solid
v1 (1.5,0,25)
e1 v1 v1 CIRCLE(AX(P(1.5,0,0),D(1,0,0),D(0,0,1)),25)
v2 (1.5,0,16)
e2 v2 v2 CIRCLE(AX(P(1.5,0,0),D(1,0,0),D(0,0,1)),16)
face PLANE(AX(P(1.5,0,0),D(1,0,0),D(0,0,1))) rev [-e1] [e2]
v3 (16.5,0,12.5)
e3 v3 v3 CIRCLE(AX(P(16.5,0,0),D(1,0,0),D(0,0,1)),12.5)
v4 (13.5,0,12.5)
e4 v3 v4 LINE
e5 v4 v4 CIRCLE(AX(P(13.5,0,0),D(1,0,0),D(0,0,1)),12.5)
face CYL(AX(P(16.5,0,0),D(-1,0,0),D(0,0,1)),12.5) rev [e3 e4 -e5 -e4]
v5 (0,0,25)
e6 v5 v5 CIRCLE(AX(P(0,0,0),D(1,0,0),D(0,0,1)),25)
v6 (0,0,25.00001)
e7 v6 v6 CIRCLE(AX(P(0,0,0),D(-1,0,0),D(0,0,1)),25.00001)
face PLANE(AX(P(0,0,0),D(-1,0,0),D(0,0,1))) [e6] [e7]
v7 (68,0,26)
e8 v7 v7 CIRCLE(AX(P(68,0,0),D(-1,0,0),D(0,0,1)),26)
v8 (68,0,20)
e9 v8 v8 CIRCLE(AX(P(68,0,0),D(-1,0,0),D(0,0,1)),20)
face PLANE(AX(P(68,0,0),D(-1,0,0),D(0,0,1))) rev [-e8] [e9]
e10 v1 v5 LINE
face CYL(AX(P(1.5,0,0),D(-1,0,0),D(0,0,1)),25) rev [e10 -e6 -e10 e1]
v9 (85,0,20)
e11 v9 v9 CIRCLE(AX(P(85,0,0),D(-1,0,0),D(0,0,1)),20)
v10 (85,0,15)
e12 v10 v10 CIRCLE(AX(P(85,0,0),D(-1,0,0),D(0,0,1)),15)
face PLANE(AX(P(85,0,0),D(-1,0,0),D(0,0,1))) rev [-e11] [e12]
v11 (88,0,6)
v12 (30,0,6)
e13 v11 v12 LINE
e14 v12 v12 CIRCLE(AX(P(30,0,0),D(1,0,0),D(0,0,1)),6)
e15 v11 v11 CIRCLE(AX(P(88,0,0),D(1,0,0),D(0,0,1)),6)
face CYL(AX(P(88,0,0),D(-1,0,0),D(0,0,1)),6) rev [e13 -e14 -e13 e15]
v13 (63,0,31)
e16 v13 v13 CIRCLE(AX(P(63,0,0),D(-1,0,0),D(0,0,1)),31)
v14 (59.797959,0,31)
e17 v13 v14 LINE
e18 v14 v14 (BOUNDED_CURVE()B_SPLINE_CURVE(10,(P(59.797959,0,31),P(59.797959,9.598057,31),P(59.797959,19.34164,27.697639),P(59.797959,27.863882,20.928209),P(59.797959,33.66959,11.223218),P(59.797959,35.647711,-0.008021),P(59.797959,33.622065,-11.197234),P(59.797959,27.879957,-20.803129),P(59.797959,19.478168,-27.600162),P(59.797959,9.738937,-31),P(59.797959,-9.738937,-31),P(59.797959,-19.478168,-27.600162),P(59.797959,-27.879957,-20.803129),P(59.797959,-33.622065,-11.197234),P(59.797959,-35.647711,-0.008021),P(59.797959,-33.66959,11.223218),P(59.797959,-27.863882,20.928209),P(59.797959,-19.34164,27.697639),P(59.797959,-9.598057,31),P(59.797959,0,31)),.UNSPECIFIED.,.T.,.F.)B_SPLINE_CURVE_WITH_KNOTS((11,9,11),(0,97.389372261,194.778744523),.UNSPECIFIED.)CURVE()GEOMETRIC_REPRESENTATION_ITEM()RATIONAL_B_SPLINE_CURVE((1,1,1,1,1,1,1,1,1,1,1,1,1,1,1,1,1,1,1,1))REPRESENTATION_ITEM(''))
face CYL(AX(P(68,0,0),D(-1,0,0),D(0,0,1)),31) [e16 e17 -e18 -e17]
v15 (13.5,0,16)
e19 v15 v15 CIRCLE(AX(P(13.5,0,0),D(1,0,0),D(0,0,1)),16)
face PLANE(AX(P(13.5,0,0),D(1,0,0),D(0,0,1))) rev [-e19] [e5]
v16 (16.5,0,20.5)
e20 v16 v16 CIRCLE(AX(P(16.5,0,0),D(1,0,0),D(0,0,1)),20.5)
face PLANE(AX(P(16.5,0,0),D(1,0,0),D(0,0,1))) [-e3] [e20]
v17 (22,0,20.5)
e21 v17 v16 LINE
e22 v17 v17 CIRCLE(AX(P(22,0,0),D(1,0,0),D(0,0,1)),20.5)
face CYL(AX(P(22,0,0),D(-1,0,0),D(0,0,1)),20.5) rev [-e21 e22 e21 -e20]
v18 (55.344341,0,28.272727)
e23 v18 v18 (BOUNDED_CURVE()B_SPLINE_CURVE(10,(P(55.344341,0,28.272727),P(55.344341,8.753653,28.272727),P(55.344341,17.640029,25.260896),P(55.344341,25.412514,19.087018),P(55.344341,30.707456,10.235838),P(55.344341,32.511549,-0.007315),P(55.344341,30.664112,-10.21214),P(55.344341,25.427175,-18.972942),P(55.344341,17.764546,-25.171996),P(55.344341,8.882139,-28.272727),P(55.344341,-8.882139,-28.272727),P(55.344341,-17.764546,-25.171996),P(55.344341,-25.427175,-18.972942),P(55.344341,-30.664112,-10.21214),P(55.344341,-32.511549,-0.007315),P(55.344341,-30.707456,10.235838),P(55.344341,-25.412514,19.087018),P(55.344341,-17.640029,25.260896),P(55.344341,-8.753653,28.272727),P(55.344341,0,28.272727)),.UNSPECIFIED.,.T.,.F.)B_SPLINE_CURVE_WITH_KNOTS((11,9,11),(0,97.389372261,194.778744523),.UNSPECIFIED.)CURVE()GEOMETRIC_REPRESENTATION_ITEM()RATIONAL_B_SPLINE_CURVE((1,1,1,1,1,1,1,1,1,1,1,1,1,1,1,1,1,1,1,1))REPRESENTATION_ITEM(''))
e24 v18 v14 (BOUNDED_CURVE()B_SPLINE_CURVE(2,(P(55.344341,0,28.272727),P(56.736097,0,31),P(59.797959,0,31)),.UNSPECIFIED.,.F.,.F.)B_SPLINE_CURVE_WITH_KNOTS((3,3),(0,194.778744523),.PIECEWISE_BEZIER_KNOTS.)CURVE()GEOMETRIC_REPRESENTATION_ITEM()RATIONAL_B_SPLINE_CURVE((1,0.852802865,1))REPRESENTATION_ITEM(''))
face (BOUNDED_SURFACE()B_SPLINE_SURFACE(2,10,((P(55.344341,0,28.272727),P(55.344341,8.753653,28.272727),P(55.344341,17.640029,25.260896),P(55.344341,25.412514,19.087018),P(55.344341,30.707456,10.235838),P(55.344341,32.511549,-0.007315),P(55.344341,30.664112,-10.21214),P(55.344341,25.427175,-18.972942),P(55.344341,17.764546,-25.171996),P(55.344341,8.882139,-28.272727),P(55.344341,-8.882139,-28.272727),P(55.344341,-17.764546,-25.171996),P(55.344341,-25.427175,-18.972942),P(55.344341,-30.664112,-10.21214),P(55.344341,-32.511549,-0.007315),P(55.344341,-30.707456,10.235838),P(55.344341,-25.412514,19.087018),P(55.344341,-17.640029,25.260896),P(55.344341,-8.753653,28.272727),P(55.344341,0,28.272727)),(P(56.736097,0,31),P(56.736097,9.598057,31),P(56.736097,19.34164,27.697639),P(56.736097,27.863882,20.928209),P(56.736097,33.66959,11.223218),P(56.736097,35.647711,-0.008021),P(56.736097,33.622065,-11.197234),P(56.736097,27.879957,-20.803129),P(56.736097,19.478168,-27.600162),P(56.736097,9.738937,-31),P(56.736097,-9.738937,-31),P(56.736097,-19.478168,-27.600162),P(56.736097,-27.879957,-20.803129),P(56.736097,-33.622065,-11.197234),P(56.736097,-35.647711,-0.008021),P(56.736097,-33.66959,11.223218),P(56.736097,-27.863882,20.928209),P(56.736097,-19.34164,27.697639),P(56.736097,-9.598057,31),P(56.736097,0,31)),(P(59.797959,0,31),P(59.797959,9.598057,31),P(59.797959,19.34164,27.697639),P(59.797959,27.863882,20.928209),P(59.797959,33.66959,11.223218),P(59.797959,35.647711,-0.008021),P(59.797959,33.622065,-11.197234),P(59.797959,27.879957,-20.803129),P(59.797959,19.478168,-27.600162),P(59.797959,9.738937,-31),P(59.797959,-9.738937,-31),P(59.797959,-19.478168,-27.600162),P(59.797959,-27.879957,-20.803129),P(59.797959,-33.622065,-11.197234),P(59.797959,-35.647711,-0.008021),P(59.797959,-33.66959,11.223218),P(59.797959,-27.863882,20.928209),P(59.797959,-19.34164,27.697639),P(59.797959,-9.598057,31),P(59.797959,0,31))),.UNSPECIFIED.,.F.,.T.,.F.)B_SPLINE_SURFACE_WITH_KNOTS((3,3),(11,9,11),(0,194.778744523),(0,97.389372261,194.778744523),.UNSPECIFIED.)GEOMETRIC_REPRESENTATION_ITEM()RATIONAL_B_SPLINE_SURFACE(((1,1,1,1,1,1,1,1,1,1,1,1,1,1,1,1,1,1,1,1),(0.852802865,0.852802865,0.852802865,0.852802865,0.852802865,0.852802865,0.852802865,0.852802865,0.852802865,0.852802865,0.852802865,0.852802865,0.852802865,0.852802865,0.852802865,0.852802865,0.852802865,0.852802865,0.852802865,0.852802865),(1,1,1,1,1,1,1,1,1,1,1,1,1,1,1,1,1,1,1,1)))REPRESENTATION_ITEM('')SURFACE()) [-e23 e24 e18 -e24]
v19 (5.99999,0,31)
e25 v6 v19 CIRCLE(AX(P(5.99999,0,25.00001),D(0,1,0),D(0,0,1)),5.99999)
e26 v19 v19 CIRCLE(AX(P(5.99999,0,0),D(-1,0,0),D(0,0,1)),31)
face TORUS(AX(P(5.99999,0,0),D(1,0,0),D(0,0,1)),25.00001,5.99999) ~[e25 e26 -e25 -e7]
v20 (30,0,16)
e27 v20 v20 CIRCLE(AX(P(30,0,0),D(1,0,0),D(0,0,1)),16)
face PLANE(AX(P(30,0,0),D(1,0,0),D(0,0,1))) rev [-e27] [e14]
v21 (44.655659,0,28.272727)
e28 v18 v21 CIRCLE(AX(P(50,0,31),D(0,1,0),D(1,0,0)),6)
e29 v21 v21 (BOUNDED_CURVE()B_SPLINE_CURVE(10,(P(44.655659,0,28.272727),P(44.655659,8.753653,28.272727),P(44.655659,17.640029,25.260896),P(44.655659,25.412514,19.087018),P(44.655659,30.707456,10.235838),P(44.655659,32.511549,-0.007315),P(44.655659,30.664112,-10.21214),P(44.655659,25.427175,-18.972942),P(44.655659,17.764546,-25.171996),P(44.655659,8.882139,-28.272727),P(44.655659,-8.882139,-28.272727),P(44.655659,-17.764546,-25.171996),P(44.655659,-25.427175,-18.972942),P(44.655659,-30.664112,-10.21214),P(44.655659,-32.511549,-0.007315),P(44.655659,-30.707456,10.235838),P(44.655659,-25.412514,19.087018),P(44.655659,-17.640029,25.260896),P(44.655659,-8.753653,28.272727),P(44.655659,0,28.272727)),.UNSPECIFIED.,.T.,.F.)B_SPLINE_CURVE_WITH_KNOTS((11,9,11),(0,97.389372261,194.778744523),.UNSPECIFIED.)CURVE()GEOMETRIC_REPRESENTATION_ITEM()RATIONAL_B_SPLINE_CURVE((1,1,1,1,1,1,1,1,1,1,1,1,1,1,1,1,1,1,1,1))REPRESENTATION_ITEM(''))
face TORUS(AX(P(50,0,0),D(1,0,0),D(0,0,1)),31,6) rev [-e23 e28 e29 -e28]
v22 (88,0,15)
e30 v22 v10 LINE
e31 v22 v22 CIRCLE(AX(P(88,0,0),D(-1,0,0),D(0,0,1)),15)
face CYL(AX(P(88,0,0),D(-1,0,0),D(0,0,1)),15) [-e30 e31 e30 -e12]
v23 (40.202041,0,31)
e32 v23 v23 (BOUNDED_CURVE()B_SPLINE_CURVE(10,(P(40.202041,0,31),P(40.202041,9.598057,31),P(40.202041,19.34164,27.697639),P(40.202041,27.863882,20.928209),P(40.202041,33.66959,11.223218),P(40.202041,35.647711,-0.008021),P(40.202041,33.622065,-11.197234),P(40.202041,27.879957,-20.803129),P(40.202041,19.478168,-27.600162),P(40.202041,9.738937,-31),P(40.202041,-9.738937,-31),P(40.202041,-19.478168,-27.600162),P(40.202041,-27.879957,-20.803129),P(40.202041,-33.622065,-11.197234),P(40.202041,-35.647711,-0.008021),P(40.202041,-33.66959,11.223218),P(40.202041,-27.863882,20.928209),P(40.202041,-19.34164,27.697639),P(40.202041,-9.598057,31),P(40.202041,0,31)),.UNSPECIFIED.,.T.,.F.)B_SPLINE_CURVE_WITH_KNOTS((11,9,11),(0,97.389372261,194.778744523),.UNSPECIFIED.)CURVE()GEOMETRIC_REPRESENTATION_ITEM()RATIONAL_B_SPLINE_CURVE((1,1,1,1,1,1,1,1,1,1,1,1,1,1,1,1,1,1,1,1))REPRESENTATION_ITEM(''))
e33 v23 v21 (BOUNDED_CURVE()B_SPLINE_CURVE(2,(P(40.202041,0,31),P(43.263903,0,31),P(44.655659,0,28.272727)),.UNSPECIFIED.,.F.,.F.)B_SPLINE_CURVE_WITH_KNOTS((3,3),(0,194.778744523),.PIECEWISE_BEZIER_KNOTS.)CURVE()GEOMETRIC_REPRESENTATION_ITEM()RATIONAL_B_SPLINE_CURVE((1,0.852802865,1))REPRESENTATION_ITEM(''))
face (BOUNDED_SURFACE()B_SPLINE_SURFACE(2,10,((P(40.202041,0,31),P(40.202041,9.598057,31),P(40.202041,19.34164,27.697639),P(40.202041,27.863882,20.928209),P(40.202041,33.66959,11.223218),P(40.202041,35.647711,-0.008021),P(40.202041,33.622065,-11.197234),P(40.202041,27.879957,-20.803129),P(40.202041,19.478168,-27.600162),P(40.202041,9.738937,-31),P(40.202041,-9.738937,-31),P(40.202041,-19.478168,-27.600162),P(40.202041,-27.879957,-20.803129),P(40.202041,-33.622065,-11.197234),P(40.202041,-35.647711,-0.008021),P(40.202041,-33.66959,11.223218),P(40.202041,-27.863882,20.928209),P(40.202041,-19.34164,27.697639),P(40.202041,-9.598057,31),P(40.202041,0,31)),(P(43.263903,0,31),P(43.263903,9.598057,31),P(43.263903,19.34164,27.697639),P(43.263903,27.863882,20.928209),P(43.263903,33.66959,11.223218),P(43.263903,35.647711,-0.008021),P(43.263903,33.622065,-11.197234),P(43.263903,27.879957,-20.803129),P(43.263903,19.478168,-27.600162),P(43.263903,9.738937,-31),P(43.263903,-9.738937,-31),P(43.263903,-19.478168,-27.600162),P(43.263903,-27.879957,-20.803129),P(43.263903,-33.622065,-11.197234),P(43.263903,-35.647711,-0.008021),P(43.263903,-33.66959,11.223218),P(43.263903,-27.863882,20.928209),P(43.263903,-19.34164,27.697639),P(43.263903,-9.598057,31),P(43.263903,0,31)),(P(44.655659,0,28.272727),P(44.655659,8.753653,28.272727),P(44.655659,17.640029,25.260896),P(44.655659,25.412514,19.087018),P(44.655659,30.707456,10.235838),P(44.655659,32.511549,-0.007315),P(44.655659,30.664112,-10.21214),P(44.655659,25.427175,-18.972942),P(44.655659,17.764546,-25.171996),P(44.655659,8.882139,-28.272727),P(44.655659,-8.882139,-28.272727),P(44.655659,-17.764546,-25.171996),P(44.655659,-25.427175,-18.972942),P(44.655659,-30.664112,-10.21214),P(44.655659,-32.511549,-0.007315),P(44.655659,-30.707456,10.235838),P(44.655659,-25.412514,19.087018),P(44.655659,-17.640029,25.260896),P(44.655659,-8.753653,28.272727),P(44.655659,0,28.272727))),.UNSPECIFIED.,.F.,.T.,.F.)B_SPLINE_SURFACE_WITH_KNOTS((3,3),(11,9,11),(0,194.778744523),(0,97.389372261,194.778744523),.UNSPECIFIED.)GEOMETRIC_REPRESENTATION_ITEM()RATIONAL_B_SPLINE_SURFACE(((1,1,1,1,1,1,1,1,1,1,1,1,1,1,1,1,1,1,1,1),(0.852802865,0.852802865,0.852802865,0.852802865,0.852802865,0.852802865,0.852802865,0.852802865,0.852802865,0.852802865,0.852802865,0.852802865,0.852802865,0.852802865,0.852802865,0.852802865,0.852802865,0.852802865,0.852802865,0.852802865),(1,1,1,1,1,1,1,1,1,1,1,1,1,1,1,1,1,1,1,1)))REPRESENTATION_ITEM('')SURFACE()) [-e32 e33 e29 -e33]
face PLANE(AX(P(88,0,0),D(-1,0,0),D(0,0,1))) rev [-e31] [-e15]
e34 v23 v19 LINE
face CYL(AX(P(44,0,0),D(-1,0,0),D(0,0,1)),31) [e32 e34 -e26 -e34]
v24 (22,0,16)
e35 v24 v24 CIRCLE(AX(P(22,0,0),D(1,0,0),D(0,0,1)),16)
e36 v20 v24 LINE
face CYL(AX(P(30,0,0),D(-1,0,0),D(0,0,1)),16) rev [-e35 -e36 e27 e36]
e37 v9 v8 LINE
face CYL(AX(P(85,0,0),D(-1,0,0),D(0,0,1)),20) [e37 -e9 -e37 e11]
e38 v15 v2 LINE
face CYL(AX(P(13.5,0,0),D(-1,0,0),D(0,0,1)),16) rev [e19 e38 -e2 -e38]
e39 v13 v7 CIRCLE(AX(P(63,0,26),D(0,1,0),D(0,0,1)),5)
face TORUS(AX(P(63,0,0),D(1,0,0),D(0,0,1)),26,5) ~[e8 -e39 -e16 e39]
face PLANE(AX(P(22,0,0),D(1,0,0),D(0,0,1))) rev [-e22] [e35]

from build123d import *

# Parameters (mm, degrees)
F4_R = 5.99999
F5_R = 5
F6_R = 5


# Not quite as in the source:
# - a fillet or chamfer is up to 0.001 mm smaller than in the source, because OpenCascade refuses the exact size


with BuildPart() as f1:
    # F0 (on Front) → F1 (revolve)
    with BuildSketch(Plane.XZ):
        with BuildLine():
            Line((0, 31), (0, 0))
            Line((0, 0), (88, 0))
            Line((88, 0), (88, 15))
            Line((88, 15), (85, 15))
            Line((85, 15), (85, 20))
            Line((85, 20), (68, 20))
            Line((68, 20), (68, 31))
            Line((68, 31), (56, 31))
            ThreePointArc((56, 31), (50, 25), (44, 31))
            Line((44, 31), (0, 31))
        make_face()
    revolve(axis=Axis((44, 0, 0), (-1, 0, 0)))

    # F2 (on Front) → F3 (revolve, cut)
    with BuildSketch(Plane.XZ):
        Polygon((0, 25), (0, 0), (88, 0), (88, 6), (30, 6), (30, 16), (22, 16), (22, 20.5), (16.5, 20.5), (16.5, 12.5), (13.5, 12.5), (13.5, 16), (1.5, 16), (1.5, 25), align=None)
    revolve(axis=Axis((44.884205035, 0, 0), (1, 0, 0)), mode=Mode.SUBTRACT)

    # F4 (radius 6 in the source; OpenCascade refuses exactly that, so slightly less here)
    f4_edges = [f1.edges().sort_by_distance(p)[0] for p in [
        (0, 0, -31),
    ]]
    fillet(f4_edges, radius=F4_R)

    # F5
    f5_edges = [f1.edges().sort_by_distance(p)[0] for p in [
        (44, 0, -31),
        (56, 0, -31),
    ]]
    fillet(f5_edges, radius=F5_R)

    # F6
    f6_edges = [f1.edges().sort_by_distance(p)[0] for p in [
        (68, 0, -31),
    ]]
    fillet(f6_edges, radius=F6_R)


solid = f1.part
